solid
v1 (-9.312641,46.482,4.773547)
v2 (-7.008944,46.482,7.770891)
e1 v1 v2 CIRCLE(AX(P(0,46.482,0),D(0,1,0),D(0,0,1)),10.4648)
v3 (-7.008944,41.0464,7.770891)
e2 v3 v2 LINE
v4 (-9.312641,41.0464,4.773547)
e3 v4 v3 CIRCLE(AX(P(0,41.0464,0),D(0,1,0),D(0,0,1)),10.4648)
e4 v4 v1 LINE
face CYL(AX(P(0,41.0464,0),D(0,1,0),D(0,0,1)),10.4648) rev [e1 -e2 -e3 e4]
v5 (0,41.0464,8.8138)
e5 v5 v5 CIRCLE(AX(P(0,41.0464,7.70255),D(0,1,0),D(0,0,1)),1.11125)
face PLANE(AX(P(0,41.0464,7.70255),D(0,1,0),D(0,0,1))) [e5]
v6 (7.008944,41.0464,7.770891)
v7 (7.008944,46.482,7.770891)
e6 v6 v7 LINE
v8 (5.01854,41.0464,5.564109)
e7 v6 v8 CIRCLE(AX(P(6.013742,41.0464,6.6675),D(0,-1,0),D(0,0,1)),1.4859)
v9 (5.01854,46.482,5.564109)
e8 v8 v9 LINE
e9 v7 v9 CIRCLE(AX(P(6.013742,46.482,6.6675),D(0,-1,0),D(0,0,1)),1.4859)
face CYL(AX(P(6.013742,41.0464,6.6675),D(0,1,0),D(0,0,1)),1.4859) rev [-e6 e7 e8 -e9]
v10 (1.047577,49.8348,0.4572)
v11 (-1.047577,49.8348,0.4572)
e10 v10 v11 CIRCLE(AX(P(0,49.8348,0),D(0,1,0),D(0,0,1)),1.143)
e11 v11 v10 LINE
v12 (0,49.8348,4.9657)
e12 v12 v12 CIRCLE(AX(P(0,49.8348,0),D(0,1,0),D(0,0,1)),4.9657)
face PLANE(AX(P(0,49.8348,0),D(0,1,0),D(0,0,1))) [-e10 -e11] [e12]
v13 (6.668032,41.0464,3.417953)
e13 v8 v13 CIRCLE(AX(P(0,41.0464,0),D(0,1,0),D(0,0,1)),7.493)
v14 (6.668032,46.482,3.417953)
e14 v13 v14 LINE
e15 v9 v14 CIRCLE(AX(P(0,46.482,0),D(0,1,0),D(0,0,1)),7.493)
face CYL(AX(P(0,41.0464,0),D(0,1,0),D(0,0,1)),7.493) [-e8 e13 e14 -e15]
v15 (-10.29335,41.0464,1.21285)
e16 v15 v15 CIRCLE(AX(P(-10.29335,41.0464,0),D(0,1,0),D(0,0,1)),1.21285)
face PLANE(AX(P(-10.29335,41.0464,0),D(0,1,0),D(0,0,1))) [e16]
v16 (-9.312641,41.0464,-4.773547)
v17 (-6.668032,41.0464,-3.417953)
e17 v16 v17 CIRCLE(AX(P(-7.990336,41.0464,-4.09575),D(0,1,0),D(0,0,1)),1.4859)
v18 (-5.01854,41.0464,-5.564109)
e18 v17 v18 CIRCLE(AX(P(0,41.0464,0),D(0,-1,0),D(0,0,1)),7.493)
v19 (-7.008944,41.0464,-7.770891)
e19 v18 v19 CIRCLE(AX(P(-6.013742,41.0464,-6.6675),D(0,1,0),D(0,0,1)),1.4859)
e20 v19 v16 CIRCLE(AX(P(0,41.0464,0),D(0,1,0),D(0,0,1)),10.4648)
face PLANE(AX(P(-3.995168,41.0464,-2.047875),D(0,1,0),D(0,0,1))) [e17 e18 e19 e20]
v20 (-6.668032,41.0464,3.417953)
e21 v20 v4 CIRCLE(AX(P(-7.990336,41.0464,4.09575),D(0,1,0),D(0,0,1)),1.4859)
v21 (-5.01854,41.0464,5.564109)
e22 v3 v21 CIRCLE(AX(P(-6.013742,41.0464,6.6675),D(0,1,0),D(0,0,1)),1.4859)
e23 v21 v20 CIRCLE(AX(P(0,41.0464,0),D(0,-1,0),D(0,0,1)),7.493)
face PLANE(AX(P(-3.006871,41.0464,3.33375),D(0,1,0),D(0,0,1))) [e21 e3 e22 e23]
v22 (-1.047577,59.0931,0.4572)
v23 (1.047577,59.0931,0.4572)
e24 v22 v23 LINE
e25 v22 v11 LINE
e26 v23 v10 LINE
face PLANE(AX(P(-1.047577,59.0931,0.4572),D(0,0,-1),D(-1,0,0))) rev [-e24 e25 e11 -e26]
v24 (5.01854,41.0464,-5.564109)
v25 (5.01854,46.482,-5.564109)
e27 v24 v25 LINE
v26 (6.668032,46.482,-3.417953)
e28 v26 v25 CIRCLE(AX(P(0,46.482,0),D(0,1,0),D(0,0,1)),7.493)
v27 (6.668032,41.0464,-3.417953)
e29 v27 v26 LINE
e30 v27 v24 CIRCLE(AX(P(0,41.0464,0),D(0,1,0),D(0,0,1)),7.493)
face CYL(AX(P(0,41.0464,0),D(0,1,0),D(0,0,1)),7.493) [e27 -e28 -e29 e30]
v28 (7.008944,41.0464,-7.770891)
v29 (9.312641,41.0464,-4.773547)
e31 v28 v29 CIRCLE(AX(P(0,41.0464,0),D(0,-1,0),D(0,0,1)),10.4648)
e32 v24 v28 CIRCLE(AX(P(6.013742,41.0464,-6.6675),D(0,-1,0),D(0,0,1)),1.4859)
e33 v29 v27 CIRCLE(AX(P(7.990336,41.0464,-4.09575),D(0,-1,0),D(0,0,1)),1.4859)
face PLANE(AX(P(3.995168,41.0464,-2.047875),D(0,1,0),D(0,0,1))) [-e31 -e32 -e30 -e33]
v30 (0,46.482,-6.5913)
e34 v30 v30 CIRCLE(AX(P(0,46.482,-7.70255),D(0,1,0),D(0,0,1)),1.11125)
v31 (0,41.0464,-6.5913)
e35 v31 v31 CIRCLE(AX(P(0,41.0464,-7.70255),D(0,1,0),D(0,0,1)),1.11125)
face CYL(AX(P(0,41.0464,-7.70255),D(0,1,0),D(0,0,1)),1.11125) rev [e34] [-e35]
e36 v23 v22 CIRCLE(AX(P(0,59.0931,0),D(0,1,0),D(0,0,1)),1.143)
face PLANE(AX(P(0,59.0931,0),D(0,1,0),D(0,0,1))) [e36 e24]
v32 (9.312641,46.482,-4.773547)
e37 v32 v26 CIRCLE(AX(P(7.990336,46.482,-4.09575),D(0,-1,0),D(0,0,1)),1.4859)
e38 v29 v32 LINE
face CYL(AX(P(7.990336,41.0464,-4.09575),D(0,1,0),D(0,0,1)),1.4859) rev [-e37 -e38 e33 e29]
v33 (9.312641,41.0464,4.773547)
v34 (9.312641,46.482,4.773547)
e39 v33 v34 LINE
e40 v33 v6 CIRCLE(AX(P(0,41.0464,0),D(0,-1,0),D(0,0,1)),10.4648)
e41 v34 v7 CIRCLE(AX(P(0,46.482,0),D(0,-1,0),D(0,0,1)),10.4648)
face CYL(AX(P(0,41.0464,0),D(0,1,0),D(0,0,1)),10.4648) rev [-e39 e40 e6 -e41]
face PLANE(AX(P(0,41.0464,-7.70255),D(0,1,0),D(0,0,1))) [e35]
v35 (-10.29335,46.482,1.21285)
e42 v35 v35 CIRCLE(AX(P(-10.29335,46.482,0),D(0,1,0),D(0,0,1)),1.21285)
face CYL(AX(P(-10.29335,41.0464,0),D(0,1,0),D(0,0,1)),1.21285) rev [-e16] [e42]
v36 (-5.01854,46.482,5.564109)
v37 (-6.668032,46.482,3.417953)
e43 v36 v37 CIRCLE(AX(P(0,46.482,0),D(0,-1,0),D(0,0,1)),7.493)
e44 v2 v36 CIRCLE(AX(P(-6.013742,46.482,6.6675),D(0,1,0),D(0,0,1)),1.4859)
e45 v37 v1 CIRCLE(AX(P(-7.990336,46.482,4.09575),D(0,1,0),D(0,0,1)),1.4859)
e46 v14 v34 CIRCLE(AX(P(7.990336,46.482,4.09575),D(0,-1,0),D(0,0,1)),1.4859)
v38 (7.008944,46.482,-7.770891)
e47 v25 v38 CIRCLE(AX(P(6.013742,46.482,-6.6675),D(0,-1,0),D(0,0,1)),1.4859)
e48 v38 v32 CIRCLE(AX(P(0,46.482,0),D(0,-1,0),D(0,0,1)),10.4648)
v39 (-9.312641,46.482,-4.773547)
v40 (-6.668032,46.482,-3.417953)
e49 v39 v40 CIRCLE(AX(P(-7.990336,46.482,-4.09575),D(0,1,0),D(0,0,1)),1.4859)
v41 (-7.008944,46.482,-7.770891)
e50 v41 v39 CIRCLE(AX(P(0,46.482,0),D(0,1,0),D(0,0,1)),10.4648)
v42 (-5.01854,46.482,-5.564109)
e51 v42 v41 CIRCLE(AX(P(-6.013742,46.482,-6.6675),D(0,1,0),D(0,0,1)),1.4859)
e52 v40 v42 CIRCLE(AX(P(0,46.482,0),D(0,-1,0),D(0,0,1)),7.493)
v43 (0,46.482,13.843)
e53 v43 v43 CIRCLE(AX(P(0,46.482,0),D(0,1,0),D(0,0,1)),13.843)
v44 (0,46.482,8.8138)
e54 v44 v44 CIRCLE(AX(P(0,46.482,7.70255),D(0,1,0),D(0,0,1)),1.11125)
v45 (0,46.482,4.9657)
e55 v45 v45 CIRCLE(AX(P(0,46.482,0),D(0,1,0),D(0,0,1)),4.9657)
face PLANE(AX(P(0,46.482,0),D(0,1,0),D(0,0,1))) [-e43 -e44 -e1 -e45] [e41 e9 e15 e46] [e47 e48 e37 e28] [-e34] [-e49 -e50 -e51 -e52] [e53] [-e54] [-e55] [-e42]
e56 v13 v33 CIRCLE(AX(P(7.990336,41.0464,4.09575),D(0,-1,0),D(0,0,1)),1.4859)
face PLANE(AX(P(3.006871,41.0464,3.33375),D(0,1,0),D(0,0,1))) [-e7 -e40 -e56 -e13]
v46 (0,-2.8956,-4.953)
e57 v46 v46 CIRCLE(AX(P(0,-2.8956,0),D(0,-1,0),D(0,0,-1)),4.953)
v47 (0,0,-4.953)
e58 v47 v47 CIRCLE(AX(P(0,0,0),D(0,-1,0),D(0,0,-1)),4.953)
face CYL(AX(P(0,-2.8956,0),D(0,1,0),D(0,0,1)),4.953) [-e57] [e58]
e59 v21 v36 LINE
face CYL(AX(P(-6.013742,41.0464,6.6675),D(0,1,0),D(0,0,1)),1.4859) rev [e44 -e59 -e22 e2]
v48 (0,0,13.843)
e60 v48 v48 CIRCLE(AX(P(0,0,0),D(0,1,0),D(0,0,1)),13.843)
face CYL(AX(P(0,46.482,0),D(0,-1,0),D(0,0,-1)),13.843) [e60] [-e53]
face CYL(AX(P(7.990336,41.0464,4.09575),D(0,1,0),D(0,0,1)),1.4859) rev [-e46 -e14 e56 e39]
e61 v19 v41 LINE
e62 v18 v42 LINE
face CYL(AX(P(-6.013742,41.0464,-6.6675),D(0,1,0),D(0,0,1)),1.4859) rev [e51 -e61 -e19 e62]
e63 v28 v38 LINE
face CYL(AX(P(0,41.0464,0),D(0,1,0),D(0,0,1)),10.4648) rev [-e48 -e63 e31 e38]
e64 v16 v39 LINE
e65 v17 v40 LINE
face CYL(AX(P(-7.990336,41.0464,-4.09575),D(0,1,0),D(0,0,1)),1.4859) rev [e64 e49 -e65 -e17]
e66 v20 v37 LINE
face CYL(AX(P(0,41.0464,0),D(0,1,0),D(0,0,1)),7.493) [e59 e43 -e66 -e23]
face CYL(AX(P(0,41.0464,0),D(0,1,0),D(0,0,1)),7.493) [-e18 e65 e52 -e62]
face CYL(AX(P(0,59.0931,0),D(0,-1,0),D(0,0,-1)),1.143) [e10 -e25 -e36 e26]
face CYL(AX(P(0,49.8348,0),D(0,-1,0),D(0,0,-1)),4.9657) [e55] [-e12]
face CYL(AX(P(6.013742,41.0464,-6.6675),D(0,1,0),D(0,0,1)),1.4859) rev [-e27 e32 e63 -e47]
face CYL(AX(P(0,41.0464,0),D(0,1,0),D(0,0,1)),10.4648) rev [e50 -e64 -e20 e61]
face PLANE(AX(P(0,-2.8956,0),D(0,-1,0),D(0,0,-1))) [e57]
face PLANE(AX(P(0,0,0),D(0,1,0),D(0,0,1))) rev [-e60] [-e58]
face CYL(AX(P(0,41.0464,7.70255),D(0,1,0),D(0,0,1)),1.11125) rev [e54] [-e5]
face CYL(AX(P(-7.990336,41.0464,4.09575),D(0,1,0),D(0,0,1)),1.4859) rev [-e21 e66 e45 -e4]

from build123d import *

# Parameters (mm, degrees)
SKETCH1_R           = 13.843
BOSS_EXTRUDE1_DEPTH = 46.482
SKETCH2_R           = 4.9657
BOSS_EXTRUDE2_DEPTH = 3.3528
SKETCH3_R           = 4.953
BOSS_EXTRUDE3_DEPTH = 2.8956
BOSS_EXTRUDE4_DEPTH = 9.2583
SKETCH5_R           = 1.11125
SKETCH5_R_2         = 1.21285
CUT_EXTRUDE1_DEPTH  = 5.4356
MIRROR1_START       = 41.0464
MIRROR1_DEPTH       = 5.4356


# Read off the part's stored shape, not the designer's step: Mirror1
with BuildPart() as part:
    # Sketch1 → Boss-Extrude1 (new body)
    with BuildSketch(Plane(origin=(0, 0, 0), x_dir=(1, 0, 0), z_dir=(0, 1, 0))):
        with Locations(Location((0, 0, 0), (0, 0, 270))):
            Circle(SKETCH1_R)
    extrude(amount=BOSS_EXTRUDE1_DEPTH)

    # Sketch2 → Boss-Extrude2 (add)
    with BuildSketch(Plane(origin=(0, 46.482, 0), x_dir=(1, 0, 0), z_dir=(0, 1, 0))):
        with Locations(Location((0, 0, 0), (0, 0, 270))):
            Circle(SKETCH2_R)
    extrude(amount=BOSS_EXTRUDE2_DEPTH)

    # Sketch3 → Boss-Extrude3 (add)
    with BuildSketch(Plane.XZ):
        with Locations(Location((0, 0, 0), (0, 0, 270))):
            Circle(SKETCH3_R)
    extrude(amount=BOSS_EXTRUDE3_DEPTH)

    # Sketch4 → Boss-Extrude4 (add)
    with BuildSketch(Plane(origin=(0, 49.8348, 0), x_dir=(1, 0, 0), z_dir=(0, 1, 0))):
        with BuildLine():
            Line((-1.047576804, -0.4572), (1.047576804, -0.4572))
            ThreePointArc((1.047576804, -0.4572), (0, 1.143), (-1.047576804, -0.4572))
        make_face()
    extrude(amount=BOSS_EXTRUDE4_DEPTH)

    # Sketch5 → Cut-Extrude1 (cut)
    with BuildSketch(Plane(origin=(0, 46.482, 0), x_dir=(1, 0, 0), z_dir=(0, 1, 0))):
        with Locations(Location((0, 7.70255, 0), (0, 0, 270))):
            Circle(SKETCH5_R)
        with Locations(Location((0, -7.70255, 0), (0, 0, 270))):
            Circle(SKETCH5_R)
        with Locations(Location((-10.29335, 0, 0), (0, 0, 270))):
            Circle(SKETCH5_R_2)
        with BuildLine():
            ThreePointArc((-5.018539731, 5.564108911), (-5.941000388, 4.566132214), (-6.668031862, 3.417952617))
            ThreePointArc((-6.668031862, 3.417952617), (-8.668133869, 2.773445377), (-9.312641109, 4.773547383))
            ThreePointArc((-9.312641109, 4.773547383), (-8.297261558, 6.377106685), (-7.008943624, 7.770891089))
            ThreePointArc((-7.008943624, 7.770891089), (-4.910350588, 7.662701947), (-5.018539731, 5.564108911))
        make_face()
        with BuildLine():
            ThreePointArc((-6.668031862, -3.417952617), (-8.668133869, -2.773445377), (-9.312641109, -4.773547383))
            ThreePointArc((-9.312641109, -4.773547383), (-8.297261558, -6.377106685), (-7.008943624, -7.770891089))
            ThreePointArc((-7.008943624, -7.770891089), (-4.910350588, -7.662701947), (-5.018539731, -5.564108911))
            ThreePointArc((-5.018539731, -5.564108911), (-5.941000388, -4.566132214), (-6.668031862, -3.417952617))
        make_face()
    extrude(amount=-CUT_EXTRUDE1_DEPTH, mode=Mode.SUBTRACT)

    # Mirror1 outline → Mirror1 (cut)
    with BuildSketch(Plane(origin=(0, 0, 0), x_dir=(1, 0, 0), z_dir=(0, 1, 0)).offset(MIRROR1_START)):
        with BuildLine():
            ThreePointArc((7.008943624, -7.770891089), (8.297261558, -6.377106685), (9.312641109, -4.773547383))
            ThreePointArc((9.312641109, -4.773547383), (8.668133868, -2.773445377), (6.668031862, -3.417952617))
            ThreePointArc((6.668031862, -3.417952617), (5.941000388, -4.566132214), (5.018539731, -5.564108911))
            ThreePointArc((5.018539731, -5.564108911), (4.910350588, -7.662701947), (7.008943624, -7.770891089))
        make_face()
        with BuildLine():
            ThreePointArc((6.668031862, 3.417952617), (8.668133868, 2.773445377), (9.312641109, 4.773547383))
            ThreePointArc((9.312641109, 4.773547383), (8.297261558, 6.377106685), (7.008943624, 7.770891089))
            ThreePointArc((7.008943624, 7.770891089), (4.910350588, 7.662701947), (5.018539731, 5.564108911))
            ThreePointArc((5.018539731, 5.564108911), (5.941000388, 4.566132214), (6.668031862, 3.417952617))
        make_face()
    extrude(amount=MIRROR1_DEPTH, mode=Mode.SUBTRACT)


solid = part.part
